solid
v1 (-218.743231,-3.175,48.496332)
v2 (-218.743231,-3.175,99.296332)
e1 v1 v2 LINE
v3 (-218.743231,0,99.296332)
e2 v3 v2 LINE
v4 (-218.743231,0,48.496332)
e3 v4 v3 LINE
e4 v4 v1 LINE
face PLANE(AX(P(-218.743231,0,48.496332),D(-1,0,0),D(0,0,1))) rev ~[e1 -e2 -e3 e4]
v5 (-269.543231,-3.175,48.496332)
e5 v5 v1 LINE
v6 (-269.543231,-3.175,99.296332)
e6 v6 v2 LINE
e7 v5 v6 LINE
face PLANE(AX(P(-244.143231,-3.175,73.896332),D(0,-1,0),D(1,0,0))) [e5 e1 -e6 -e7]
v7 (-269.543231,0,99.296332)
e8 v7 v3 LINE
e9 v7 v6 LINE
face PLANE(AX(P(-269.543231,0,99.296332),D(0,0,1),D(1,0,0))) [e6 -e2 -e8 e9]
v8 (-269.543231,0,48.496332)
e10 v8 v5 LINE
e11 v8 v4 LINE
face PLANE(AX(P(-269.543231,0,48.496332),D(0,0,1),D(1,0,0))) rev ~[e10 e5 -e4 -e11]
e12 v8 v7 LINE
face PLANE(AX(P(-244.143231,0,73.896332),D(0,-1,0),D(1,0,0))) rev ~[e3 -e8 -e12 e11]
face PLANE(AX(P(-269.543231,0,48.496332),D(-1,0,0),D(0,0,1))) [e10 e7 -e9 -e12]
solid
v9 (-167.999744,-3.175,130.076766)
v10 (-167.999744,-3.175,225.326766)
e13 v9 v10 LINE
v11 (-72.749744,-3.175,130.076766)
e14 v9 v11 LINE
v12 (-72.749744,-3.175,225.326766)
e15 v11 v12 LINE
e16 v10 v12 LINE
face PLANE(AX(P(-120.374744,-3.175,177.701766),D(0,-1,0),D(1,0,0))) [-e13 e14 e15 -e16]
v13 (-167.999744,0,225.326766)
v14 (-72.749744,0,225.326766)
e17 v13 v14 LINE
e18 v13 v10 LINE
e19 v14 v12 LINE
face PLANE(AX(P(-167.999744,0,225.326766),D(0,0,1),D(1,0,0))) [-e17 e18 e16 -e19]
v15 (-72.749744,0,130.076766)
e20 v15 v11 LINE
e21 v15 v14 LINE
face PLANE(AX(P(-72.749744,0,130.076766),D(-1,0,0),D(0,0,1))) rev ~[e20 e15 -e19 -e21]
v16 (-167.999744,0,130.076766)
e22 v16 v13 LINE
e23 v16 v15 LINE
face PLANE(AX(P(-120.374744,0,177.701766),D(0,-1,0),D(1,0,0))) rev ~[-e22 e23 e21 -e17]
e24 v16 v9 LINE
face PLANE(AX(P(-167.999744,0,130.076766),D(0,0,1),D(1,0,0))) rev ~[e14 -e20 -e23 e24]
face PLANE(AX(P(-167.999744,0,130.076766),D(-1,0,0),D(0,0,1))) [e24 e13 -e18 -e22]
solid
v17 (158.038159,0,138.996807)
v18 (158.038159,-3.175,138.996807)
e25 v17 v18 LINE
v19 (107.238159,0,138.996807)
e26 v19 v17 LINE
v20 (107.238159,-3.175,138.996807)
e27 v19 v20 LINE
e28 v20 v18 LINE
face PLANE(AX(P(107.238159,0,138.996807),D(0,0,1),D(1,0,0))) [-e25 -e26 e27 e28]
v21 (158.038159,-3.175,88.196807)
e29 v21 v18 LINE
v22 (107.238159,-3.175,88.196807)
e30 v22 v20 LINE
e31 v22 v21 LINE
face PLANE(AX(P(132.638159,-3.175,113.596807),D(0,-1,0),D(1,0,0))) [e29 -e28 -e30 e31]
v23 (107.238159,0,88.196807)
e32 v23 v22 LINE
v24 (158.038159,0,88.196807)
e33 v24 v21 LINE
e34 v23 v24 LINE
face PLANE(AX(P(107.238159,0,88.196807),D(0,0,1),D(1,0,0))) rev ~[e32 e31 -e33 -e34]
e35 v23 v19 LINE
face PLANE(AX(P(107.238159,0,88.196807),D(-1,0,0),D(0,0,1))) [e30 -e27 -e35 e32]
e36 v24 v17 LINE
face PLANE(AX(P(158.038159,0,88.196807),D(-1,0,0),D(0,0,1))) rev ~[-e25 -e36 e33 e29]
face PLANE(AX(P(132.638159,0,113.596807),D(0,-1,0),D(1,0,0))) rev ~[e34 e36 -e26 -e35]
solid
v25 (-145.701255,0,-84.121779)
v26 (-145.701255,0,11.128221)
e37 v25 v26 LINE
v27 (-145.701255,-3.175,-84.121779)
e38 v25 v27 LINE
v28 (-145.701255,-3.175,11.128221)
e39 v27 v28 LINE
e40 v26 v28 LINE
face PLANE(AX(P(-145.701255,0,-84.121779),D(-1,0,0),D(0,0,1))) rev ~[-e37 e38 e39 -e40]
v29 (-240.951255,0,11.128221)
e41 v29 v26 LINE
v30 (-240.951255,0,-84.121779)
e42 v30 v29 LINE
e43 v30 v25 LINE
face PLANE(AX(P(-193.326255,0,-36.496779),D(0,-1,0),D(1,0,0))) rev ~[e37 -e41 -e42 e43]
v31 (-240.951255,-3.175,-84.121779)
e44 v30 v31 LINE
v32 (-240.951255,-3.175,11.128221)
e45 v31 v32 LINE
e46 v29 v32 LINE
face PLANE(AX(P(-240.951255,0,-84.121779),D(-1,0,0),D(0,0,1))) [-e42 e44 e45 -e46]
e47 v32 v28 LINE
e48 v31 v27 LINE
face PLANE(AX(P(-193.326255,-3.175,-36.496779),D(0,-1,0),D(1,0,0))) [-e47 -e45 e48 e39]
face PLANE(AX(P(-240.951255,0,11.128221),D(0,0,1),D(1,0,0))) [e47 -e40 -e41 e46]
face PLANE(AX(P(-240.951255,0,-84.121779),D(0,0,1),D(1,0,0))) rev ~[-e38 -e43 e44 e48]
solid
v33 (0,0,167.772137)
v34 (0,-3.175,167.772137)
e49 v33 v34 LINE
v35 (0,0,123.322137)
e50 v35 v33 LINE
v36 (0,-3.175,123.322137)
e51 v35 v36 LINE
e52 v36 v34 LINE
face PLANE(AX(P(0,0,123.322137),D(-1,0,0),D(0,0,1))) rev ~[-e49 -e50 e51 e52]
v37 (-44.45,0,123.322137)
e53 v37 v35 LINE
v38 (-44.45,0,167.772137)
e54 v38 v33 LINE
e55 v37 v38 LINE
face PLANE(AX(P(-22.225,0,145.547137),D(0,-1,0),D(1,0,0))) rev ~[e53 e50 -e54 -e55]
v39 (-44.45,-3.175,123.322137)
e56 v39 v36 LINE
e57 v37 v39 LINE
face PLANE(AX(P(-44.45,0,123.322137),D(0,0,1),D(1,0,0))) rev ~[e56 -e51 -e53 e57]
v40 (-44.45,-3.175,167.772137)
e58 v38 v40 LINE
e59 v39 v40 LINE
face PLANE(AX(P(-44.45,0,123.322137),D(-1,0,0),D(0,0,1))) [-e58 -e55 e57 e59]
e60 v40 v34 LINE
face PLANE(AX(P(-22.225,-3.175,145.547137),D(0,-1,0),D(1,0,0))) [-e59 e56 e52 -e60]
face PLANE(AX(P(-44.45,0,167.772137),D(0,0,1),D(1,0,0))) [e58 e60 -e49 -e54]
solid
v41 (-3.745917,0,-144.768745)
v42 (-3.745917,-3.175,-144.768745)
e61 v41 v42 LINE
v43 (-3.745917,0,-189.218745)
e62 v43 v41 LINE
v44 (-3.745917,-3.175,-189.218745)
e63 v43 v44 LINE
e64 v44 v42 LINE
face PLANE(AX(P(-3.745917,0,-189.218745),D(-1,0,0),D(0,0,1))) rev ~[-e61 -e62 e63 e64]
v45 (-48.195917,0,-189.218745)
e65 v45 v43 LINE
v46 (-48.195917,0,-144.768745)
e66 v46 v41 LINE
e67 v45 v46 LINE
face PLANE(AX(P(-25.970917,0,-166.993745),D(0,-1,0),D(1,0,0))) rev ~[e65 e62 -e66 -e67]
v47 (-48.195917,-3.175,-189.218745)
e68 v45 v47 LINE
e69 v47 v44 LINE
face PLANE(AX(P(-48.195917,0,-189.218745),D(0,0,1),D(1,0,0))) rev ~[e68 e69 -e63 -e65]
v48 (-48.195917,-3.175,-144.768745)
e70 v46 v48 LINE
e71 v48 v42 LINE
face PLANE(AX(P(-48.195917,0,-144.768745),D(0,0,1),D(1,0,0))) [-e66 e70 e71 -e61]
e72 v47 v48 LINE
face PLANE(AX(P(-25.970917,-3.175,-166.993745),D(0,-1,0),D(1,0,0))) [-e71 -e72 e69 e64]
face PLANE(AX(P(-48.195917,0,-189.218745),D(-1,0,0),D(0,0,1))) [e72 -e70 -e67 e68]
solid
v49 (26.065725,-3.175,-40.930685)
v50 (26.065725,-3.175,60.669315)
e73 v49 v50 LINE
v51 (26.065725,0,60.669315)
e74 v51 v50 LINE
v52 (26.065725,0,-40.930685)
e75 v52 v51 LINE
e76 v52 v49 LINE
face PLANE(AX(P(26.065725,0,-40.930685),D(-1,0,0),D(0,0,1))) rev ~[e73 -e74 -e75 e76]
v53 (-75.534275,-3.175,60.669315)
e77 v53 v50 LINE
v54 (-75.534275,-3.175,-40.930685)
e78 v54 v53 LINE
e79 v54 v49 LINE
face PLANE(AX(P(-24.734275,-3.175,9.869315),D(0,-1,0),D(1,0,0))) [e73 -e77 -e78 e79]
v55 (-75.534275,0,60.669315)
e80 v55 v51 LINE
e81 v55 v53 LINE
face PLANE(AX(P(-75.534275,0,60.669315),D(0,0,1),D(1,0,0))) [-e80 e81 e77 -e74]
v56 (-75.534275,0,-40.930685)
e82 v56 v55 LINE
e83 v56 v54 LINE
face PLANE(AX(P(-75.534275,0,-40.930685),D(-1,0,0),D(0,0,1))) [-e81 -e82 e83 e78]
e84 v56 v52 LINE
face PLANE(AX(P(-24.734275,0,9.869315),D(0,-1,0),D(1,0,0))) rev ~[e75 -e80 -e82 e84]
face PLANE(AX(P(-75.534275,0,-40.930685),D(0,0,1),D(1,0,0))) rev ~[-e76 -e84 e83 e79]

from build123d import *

# Parameters (mm, degrees)
F0_W     = 95.25
F0_H     = 95.25
F1_DEPTH = 3.175
F0_W_2   = 50.8
F0_H_2   = 50.8
F0_W_3   = 101.6
F0_H_3   = 101.6
F0_W_4   = 44.45
F0_H_4   = 44.45


# Not quite as in the source:
# - a length typed as a fraction of an inch, garbled in the dataset ("3 / 203.2 mm" for 3/8 in), is restored


with BuildPart() as f1:
    # F0 (on Front) → F1 (new body)
    with BuildSketch(Plane.XZ):
        with Locations((-193.3262549639, -36.4967786074)):
            Rectangle(F0_W, F0_H)
    extrude(amount=F1_DEPTH)


with BuildPart() as f1b:
    # F0 (on Front) → F1, piece 2 (new body)
    with BuildSketch(Plane.XZ):
        with Locations((-244.1432305336, 73.8963320196)):
            Rectangle(F0_W_2, F0_H_2)
    extrude(amount=F1_DEPTH)


with BuildPart() as f1c:
    # F0 (on Front) → F1, piece 3 (new body)
    with BuildSketch(Plane.XZ):
        with Locations((-24.7342750663, 9.8693149265)):
            Rectangle(F0_W_3, F0_H_3)
    extrude(amount=F1_DEPTH)


with BuildPart() as f1d:
    # F0 (on Front) → F1, piece 4 (new body)
    with BuildSketch(Plane.XZ):
        with Locations((-22.225, 145.5471367002)):
            Rectangle(F0_W_4, F0_H_4)
    extrude(amount=F1_DEPTH)


with BuildPart() as f1e:
    # F0 (on Front) → F1, piece 5 (new body)
    with BuildSketch(Plane.XZ):
        with Locations((-120.3747444153, 177.7017660141)):
            Rectangle(F0_W, F0_H)
    extrude(amount=F1_DEPTH)


with BuildPart() as f1f:
    # F0 (on Front) → F1, piece 6 (new body)
    with BuildSketch(Plane.XZ):
        with Locations((132.6381585836, 113.5968066096)):
            Rectangle(F0_W_2, F0_H_2)
    extrude(amount=F1_DEPTH)


with BuildPart() as f1g:
    # F0 (on Front) → F1, piece 7 (new body)
    with BuildSketch(Plane.XZ):
        with Locations((-25.9709171593, -166.9937446356)):
            Rectangle(F0_W_4, F0_H_4)
    extrude(amount=F1_DEPTH)


solid = Compound([f1.part, f1b.part, f1c.part, f1d.part, f1e.part, f1f.part, f1g.part])
